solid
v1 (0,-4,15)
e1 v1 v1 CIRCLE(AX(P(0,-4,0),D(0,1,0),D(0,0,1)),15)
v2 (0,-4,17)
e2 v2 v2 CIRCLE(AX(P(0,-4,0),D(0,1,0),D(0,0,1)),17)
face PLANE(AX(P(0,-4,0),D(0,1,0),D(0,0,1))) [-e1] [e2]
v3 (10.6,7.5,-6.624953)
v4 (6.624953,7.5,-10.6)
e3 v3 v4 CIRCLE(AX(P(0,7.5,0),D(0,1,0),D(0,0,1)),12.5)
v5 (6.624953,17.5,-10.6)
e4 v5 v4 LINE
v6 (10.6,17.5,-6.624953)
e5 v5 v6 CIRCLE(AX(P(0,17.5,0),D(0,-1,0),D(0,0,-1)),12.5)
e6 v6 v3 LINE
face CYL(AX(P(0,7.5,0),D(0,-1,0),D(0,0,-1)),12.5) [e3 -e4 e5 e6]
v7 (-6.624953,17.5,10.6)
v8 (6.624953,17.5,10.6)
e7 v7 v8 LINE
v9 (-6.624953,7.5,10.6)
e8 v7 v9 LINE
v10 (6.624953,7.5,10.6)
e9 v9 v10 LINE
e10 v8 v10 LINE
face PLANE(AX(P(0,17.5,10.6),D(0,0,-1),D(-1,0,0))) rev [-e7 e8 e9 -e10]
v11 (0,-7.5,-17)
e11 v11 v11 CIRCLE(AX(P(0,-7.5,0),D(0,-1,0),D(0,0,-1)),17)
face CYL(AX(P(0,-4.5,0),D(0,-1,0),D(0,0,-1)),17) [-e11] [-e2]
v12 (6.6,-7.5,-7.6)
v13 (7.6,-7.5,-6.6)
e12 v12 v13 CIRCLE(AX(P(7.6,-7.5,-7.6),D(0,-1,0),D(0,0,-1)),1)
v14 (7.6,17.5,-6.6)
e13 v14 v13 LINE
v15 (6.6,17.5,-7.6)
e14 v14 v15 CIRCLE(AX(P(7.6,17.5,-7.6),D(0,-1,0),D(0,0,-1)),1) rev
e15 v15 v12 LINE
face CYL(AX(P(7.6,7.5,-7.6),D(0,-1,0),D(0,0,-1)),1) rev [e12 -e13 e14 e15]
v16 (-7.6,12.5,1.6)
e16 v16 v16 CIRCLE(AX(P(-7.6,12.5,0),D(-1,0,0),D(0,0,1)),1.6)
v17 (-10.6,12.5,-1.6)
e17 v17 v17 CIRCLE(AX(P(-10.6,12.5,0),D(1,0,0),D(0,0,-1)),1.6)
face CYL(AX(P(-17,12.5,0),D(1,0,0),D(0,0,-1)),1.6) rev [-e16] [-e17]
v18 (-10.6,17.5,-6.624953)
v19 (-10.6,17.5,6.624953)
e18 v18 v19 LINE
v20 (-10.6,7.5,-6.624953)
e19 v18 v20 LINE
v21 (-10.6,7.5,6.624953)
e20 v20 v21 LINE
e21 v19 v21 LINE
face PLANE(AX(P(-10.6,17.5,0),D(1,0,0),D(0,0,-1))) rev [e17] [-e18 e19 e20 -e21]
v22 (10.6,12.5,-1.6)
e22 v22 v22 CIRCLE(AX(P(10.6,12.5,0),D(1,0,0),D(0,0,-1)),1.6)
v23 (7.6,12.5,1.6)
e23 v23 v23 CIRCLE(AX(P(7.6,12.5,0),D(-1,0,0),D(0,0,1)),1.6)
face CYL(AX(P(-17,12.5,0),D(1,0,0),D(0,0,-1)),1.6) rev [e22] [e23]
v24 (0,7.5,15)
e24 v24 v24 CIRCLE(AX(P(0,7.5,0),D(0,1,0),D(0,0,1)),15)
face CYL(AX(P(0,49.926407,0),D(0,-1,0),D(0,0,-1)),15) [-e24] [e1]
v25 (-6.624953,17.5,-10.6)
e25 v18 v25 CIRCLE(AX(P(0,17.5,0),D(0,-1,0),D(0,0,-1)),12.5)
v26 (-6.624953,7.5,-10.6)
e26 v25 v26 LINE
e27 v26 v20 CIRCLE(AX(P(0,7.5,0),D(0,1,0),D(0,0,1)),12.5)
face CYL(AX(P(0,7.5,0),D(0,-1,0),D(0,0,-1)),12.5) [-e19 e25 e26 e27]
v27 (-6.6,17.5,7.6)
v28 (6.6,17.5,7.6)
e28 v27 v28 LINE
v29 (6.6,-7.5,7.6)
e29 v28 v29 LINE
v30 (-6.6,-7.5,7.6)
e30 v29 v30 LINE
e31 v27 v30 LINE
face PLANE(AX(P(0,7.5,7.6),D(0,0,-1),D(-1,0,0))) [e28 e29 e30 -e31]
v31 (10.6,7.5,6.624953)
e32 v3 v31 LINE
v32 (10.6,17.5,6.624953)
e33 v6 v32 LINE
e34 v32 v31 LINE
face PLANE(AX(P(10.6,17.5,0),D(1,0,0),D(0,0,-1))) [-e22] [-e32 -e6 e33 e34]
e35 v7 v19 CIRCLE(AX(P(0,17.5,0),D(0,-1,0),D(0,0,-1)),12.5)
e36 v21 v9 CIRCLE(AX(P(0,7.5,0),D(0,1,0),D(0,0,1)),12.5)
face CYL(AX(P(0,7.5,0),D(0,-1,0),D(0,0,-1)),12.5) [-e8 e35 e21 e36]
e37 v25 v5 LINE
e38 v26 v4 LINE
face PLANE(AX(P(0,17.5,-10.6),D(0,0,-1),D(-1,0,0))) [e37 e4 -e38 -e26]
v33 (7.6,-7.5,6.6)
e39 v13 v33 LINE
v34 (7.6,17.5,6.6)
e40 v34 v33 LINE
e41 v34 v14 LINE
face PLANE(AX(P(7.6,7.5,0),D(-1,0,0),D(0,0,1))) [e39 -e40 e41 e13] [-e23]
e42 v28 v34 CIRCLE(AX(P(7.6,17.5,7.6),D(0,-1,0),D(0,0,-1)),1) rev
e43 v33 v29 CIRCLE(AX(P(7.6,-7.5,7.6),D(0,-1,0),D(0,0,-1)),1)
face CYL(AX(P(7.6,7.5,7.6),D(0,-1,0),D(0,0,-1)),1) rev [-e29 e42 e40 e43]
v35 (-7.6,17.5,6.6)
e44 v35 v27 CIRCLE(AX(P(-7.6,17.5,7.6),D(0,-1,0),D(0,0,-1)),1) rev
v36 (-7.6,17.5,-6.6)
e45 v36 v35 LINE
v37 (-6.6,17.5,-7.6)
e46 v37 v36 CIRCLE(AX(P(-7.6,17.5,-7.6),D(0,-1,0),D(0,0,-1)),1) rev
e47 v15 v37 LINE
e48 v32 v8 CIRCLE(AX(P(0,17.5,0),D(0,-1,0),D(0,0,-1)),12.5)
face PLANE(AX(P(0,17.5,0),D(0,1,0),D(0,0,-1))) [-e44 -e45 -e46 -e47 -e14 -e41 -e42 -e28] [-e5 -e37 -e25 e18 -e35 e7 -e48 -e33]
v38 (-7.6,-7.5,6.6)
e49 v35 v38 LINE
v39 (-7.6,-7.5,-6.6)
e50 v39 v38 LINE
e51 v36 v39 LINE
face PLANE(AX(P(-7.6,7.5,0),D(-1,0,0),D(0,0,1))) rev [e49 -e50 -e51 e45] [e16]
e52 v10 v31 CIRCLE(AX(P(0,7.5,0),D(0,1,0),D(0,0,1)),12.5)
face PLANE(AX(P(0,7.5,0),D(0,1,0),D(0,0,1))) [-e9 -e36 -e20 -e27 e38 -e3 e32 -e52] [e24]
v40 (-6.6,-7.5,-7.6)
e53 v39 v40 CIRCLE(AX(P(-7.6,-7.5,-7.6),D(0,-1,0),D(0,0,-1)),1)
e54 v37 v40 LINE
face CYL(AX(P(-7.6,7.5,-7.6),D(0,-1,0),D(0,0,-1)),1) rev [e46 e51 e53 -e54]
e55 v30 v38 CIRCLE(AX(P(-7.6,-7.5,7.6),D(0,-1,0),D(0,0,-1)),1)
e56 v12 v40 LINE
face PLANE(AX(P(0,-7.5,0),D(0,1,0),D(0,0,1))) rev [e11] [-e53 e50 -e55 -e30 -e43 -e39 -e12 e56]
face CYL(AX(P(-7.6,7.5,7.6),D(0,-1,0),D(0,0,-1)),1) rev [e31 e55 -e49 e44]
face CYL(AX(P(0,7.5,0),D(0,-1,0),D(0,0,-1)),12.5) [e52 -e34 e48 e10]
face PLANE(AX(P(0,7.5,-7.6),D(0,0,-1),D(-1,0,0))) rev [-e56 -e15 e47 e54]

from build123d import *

# Parameters (mm, degrees)
SKETCH_1_R          = 12.5
EXTRUDE_1_DEPTH     = 7.5
EXTRUDE_2_DEPTH     = 10
EXTRUDE_START       = -3
SKETCH_3_R          = 17
SKETCH_3_R_2        = 12.5
EXTRUDE_3_DEPTH     = 3
SKETCH_4_R          = 2.1000000000000005
CUT_EXTRUDE_1_DEPTH = 37.83761664386012
SKETCH_5_R          = 1.6000000000000003
CUT_EXTRUDE_2_DEPTH = 37.83761664386012
CUT_EXTRUDE_START   = -10
CUT_EXTRUDE_3_DEPTH = 10
SKETCH_7_R          = 17
SKETCH_7_R_2        = 12.500000000000004
EXTRUDE_4_DEPTH     = 0.5
SKETCH_8_R          = 15
SKETCH_8_R_2        = 12.499999999999996
EXTRUDE_5_DEPTH     = 11.5


# Read off the part's stored shape, not the designer's step: 凸台-拉伸2
with BuildPart() as part:
    # 草图1 → 凸台-拉伸1 (new, symmetric)
    with BuildSketch(Plane(origin=(0, 0, 0), x_dir=(1, 0, 0), z_dir=(0, 1, 0))):
        with Locations(Location((-1.39e-15, 1.39e-15, 0), (0, 0, 270))):
            Circle(SKETCH_1_R)
        with BuildLine():
            Line((6.600000000000003, -7.6000000000000005), (-6.599999999999996, -7.6000000000000005))
            ThreePointArc((-6.599999999999996, -7.6000000000000005), (-8.30710678118655, -8.307106781186542), (-7.599999999999978, -6.6000000000000005))
            Line((-7.599999999999996, -6.6000000000000005), (-7.599999999999996, 6.599999999999999))
            ThreePointArc((-7.599999999999978, 6.599999999999999), (-8.30710678118655, 8.30710678118654), (-6.599999999999996, 7.599999999999999))
            Line((-6.599999999999996, 7.599999999999999), (6.600000000000003, 7.599999999999999))
            ThreePointArc((6.600000000000002, 7.599999999999999), (7.600000000000003, 8.6), (8.600000000000005, 7.599999999999999))
            ThreePointArc((8.600000000000005, 7.599999999999999), (8.307106781186558, 6.892893218813457), (7.600000000000021, 6.599999999999998))
            Line((7.600000000000003, 6.599999999999999), (7.600000000000003, -6.6))
            ThreePointArc((7.600000000000021, -6.6), (8.307106781186558, -6.892893218813459), (8.600000000000003, -7.6000000000000005))
            ThreePointArc((8.600000000000003, -7.6000000000000005), (7.600000000000003, -8.600000000000001), (6.600000000000002, -7.6000000000000005))
        make_face(mode=Mode.SUBTRACT)
    extrude(amount=EXTRUDE_1_DEPTH, both=True)

    # 凸台-拉伸2 outline → 凸台-拉伸2 (add)
    with BuildSketch(Plane.XZ.offset(7.5)):
        with BuildLine():
            Line((10.6, -6.62495283), (10.6, 6.62495283))
            ThreePointArc((10.6, 6.62495283), (8.838834765, 8.838834765), (6.62495283, 10.6))
            Line((6.62495283, 10.6), (-6.62495283, 10.6))
            ThreePointArc((-6.62495283, 10.6), (-8.838834765, 8.838834765), (-10.6, 6.62495283))
            Line((-10.6, 6.62495283), (-10.6, -6.62495283))
            ThreePointArc((-10.6, -6.62495283), (-8.838834765, -8.838834765), (-6.62495283, -10.6))
            Line((-6.62495283, -10.6), (6.62495283, -10.6))
            ThreePointArc((6.62495283, -10.6), (8.838834765, -8.838834765), (10.6, -6.62495283))
        make_face()
        with BuildLine():
            ThreePointArc((-6.6, -7.6), (-8.307106781, -8.307106781), (-7.6, -6.6))
            Line((-7.6, -6.6), (-7.6, 6.6))
            ThreePointArc((-7.6, 6.6), (-8.307106781, 8.307106781), (-6.6, 7.6))
            Line((-6.6, 7.6), (6.6, 7.6))
            ThreePointArc((6.6, 7.6), (8.307106781, 8.307106781), (7.6, 6.6))
            Line((7.6, 6.6), (7.6, -6.6))
            ThreePointArc((7.6, -6.6), (8.307106781, -8.307106781), (6.6, -7.6))
            Line((6.6, -7.6), (-6.6, -7.6))
        make_face(mode=Mode.SUBTRACT)
    extrude_2 = extrude(amount=EXTRUDE_2_DEPTH)

    # 镜向1: 凸台-拉伸2 across plane
    add(extrude_2.mirror(Plane.ZX))

    # 草图3 → 凸台-拉伸3 (add)
    with BuildSketch(Plane.XZ.offset(7.5).offset(EXTRUDE_START)):
        with Locations(Location((0, 0, 0), (0, 0, 270))):
            Circle(SKETCH_3_R)
        with Locations(Location((0, 0, 0), (0, 0, 270))):
            Circle(SKETCH_3_R_2, mode=Mode.SUBTRACT)
    extrude(amount=EXTRUDE_3_DEPTH)

    # 草图4 → 切除-拉伸1 (cut, through all)
    with BuildSketch(Plane.XY.offset(10.600000000000001)):
        with Locations((-8.7e-16, -12.5)):
            Circle(SKETCH_4_R)
    extrude(amount=-CUT_EXTRUDE_1_DEPTH, mode=Mode.SUBTRACT)

    # 草图5 → 切除-拉伸2 (cut, through all)
    with BuildSketch(Plane(origin=(10.6, 0, 0), x_dir=(0, 0, -1), z_dir=(1, 0, 0))):
        with Locations((1.73e-15, 12.5)):
            Circle(SKETCH_5_R)
    extrude(amount=-CUT_EXTRUDE_2_DEPTH, mode=Mode.SUBTRACT)

    # 草图6 → 切除-拉伸3 (cut)
    with BuildSketch(Plane.XZ.offset(17.5).offset(CUT_EXTRUDE_START)):
        with BuildLine():
            Line((10.599999999999996, -6.624952830020757), (10.6, 6.624952830020752))
            ThreePointArc((10.6, 6.624952830020752), (8.83883476483184, 8.838834764831846), (6.6249528300207485, 10.600000000000001))
            Line((6.6249528300207485, 10.600000000000001), (-6.624952830020753, 10.600000000000001))
            ThreePointArc((-6.624952830020753, 10.600000000000001), (-8.838834764831846, 8.838834764831844), (-10.6, 6.624952830020758))
            Line((-10.6, 6.624952830020758), (-10.6, -6.624952830020761))
            ThreePointArc((-10.6, -6.624952830020761), (-8.83883476483185, -8.838834764831843), (-6.624952830020767, -10.599999999999994))
            Line((-6.624952830020767, -10.599999999999994), (6.624952830020759, -10.599999999999998))
            ThreePointArc((6.624952830020759, -10.599999999999998), (8.838834764831844, -8.838834764831844), (10.599999999999996, -6.624952830020757))
        make_face()
    extrude(amount=CUT_EXTRUDE_3_DEPTH, mode=Mode.SUBTRACT)

    # 草图7 → 凸台-拉伸4 (add)
    with BuildSketch(Plane(origin=(0, -4.5, 0), x_dir=(1, 0, 0), z_dir=(0, 1, 0))):
        with Locations(Location((0, 0, 0), (0, 0, 90))):
            Circle(SKETCH_7_R)
        with Locations(Location((0, 0, 0), (0, 0, 122.005199861))):
            Circle(SKETCH_7_R_2, mode=Mode.SUBTRACT)
    extrude(amount=EXTRUDE_4_DEPTH)

    # 草图8 → 凸台-拉伸5 (add)
    with BuildSketch(Plane(origin=(0, -4, 0), x_dir=(1, 0, 0), z_dir=(0, 1, 0))):
        with Locations(Location((0, 0, 0), (0, 0, 270))):
            Circle(SKETCH_8_R)
        Circle(SKETCH_8_R_2, mode=Mode.SUBTRACT)
    extrude(amount=EXTRUDE_5_DEPTH)


solid = part.part
